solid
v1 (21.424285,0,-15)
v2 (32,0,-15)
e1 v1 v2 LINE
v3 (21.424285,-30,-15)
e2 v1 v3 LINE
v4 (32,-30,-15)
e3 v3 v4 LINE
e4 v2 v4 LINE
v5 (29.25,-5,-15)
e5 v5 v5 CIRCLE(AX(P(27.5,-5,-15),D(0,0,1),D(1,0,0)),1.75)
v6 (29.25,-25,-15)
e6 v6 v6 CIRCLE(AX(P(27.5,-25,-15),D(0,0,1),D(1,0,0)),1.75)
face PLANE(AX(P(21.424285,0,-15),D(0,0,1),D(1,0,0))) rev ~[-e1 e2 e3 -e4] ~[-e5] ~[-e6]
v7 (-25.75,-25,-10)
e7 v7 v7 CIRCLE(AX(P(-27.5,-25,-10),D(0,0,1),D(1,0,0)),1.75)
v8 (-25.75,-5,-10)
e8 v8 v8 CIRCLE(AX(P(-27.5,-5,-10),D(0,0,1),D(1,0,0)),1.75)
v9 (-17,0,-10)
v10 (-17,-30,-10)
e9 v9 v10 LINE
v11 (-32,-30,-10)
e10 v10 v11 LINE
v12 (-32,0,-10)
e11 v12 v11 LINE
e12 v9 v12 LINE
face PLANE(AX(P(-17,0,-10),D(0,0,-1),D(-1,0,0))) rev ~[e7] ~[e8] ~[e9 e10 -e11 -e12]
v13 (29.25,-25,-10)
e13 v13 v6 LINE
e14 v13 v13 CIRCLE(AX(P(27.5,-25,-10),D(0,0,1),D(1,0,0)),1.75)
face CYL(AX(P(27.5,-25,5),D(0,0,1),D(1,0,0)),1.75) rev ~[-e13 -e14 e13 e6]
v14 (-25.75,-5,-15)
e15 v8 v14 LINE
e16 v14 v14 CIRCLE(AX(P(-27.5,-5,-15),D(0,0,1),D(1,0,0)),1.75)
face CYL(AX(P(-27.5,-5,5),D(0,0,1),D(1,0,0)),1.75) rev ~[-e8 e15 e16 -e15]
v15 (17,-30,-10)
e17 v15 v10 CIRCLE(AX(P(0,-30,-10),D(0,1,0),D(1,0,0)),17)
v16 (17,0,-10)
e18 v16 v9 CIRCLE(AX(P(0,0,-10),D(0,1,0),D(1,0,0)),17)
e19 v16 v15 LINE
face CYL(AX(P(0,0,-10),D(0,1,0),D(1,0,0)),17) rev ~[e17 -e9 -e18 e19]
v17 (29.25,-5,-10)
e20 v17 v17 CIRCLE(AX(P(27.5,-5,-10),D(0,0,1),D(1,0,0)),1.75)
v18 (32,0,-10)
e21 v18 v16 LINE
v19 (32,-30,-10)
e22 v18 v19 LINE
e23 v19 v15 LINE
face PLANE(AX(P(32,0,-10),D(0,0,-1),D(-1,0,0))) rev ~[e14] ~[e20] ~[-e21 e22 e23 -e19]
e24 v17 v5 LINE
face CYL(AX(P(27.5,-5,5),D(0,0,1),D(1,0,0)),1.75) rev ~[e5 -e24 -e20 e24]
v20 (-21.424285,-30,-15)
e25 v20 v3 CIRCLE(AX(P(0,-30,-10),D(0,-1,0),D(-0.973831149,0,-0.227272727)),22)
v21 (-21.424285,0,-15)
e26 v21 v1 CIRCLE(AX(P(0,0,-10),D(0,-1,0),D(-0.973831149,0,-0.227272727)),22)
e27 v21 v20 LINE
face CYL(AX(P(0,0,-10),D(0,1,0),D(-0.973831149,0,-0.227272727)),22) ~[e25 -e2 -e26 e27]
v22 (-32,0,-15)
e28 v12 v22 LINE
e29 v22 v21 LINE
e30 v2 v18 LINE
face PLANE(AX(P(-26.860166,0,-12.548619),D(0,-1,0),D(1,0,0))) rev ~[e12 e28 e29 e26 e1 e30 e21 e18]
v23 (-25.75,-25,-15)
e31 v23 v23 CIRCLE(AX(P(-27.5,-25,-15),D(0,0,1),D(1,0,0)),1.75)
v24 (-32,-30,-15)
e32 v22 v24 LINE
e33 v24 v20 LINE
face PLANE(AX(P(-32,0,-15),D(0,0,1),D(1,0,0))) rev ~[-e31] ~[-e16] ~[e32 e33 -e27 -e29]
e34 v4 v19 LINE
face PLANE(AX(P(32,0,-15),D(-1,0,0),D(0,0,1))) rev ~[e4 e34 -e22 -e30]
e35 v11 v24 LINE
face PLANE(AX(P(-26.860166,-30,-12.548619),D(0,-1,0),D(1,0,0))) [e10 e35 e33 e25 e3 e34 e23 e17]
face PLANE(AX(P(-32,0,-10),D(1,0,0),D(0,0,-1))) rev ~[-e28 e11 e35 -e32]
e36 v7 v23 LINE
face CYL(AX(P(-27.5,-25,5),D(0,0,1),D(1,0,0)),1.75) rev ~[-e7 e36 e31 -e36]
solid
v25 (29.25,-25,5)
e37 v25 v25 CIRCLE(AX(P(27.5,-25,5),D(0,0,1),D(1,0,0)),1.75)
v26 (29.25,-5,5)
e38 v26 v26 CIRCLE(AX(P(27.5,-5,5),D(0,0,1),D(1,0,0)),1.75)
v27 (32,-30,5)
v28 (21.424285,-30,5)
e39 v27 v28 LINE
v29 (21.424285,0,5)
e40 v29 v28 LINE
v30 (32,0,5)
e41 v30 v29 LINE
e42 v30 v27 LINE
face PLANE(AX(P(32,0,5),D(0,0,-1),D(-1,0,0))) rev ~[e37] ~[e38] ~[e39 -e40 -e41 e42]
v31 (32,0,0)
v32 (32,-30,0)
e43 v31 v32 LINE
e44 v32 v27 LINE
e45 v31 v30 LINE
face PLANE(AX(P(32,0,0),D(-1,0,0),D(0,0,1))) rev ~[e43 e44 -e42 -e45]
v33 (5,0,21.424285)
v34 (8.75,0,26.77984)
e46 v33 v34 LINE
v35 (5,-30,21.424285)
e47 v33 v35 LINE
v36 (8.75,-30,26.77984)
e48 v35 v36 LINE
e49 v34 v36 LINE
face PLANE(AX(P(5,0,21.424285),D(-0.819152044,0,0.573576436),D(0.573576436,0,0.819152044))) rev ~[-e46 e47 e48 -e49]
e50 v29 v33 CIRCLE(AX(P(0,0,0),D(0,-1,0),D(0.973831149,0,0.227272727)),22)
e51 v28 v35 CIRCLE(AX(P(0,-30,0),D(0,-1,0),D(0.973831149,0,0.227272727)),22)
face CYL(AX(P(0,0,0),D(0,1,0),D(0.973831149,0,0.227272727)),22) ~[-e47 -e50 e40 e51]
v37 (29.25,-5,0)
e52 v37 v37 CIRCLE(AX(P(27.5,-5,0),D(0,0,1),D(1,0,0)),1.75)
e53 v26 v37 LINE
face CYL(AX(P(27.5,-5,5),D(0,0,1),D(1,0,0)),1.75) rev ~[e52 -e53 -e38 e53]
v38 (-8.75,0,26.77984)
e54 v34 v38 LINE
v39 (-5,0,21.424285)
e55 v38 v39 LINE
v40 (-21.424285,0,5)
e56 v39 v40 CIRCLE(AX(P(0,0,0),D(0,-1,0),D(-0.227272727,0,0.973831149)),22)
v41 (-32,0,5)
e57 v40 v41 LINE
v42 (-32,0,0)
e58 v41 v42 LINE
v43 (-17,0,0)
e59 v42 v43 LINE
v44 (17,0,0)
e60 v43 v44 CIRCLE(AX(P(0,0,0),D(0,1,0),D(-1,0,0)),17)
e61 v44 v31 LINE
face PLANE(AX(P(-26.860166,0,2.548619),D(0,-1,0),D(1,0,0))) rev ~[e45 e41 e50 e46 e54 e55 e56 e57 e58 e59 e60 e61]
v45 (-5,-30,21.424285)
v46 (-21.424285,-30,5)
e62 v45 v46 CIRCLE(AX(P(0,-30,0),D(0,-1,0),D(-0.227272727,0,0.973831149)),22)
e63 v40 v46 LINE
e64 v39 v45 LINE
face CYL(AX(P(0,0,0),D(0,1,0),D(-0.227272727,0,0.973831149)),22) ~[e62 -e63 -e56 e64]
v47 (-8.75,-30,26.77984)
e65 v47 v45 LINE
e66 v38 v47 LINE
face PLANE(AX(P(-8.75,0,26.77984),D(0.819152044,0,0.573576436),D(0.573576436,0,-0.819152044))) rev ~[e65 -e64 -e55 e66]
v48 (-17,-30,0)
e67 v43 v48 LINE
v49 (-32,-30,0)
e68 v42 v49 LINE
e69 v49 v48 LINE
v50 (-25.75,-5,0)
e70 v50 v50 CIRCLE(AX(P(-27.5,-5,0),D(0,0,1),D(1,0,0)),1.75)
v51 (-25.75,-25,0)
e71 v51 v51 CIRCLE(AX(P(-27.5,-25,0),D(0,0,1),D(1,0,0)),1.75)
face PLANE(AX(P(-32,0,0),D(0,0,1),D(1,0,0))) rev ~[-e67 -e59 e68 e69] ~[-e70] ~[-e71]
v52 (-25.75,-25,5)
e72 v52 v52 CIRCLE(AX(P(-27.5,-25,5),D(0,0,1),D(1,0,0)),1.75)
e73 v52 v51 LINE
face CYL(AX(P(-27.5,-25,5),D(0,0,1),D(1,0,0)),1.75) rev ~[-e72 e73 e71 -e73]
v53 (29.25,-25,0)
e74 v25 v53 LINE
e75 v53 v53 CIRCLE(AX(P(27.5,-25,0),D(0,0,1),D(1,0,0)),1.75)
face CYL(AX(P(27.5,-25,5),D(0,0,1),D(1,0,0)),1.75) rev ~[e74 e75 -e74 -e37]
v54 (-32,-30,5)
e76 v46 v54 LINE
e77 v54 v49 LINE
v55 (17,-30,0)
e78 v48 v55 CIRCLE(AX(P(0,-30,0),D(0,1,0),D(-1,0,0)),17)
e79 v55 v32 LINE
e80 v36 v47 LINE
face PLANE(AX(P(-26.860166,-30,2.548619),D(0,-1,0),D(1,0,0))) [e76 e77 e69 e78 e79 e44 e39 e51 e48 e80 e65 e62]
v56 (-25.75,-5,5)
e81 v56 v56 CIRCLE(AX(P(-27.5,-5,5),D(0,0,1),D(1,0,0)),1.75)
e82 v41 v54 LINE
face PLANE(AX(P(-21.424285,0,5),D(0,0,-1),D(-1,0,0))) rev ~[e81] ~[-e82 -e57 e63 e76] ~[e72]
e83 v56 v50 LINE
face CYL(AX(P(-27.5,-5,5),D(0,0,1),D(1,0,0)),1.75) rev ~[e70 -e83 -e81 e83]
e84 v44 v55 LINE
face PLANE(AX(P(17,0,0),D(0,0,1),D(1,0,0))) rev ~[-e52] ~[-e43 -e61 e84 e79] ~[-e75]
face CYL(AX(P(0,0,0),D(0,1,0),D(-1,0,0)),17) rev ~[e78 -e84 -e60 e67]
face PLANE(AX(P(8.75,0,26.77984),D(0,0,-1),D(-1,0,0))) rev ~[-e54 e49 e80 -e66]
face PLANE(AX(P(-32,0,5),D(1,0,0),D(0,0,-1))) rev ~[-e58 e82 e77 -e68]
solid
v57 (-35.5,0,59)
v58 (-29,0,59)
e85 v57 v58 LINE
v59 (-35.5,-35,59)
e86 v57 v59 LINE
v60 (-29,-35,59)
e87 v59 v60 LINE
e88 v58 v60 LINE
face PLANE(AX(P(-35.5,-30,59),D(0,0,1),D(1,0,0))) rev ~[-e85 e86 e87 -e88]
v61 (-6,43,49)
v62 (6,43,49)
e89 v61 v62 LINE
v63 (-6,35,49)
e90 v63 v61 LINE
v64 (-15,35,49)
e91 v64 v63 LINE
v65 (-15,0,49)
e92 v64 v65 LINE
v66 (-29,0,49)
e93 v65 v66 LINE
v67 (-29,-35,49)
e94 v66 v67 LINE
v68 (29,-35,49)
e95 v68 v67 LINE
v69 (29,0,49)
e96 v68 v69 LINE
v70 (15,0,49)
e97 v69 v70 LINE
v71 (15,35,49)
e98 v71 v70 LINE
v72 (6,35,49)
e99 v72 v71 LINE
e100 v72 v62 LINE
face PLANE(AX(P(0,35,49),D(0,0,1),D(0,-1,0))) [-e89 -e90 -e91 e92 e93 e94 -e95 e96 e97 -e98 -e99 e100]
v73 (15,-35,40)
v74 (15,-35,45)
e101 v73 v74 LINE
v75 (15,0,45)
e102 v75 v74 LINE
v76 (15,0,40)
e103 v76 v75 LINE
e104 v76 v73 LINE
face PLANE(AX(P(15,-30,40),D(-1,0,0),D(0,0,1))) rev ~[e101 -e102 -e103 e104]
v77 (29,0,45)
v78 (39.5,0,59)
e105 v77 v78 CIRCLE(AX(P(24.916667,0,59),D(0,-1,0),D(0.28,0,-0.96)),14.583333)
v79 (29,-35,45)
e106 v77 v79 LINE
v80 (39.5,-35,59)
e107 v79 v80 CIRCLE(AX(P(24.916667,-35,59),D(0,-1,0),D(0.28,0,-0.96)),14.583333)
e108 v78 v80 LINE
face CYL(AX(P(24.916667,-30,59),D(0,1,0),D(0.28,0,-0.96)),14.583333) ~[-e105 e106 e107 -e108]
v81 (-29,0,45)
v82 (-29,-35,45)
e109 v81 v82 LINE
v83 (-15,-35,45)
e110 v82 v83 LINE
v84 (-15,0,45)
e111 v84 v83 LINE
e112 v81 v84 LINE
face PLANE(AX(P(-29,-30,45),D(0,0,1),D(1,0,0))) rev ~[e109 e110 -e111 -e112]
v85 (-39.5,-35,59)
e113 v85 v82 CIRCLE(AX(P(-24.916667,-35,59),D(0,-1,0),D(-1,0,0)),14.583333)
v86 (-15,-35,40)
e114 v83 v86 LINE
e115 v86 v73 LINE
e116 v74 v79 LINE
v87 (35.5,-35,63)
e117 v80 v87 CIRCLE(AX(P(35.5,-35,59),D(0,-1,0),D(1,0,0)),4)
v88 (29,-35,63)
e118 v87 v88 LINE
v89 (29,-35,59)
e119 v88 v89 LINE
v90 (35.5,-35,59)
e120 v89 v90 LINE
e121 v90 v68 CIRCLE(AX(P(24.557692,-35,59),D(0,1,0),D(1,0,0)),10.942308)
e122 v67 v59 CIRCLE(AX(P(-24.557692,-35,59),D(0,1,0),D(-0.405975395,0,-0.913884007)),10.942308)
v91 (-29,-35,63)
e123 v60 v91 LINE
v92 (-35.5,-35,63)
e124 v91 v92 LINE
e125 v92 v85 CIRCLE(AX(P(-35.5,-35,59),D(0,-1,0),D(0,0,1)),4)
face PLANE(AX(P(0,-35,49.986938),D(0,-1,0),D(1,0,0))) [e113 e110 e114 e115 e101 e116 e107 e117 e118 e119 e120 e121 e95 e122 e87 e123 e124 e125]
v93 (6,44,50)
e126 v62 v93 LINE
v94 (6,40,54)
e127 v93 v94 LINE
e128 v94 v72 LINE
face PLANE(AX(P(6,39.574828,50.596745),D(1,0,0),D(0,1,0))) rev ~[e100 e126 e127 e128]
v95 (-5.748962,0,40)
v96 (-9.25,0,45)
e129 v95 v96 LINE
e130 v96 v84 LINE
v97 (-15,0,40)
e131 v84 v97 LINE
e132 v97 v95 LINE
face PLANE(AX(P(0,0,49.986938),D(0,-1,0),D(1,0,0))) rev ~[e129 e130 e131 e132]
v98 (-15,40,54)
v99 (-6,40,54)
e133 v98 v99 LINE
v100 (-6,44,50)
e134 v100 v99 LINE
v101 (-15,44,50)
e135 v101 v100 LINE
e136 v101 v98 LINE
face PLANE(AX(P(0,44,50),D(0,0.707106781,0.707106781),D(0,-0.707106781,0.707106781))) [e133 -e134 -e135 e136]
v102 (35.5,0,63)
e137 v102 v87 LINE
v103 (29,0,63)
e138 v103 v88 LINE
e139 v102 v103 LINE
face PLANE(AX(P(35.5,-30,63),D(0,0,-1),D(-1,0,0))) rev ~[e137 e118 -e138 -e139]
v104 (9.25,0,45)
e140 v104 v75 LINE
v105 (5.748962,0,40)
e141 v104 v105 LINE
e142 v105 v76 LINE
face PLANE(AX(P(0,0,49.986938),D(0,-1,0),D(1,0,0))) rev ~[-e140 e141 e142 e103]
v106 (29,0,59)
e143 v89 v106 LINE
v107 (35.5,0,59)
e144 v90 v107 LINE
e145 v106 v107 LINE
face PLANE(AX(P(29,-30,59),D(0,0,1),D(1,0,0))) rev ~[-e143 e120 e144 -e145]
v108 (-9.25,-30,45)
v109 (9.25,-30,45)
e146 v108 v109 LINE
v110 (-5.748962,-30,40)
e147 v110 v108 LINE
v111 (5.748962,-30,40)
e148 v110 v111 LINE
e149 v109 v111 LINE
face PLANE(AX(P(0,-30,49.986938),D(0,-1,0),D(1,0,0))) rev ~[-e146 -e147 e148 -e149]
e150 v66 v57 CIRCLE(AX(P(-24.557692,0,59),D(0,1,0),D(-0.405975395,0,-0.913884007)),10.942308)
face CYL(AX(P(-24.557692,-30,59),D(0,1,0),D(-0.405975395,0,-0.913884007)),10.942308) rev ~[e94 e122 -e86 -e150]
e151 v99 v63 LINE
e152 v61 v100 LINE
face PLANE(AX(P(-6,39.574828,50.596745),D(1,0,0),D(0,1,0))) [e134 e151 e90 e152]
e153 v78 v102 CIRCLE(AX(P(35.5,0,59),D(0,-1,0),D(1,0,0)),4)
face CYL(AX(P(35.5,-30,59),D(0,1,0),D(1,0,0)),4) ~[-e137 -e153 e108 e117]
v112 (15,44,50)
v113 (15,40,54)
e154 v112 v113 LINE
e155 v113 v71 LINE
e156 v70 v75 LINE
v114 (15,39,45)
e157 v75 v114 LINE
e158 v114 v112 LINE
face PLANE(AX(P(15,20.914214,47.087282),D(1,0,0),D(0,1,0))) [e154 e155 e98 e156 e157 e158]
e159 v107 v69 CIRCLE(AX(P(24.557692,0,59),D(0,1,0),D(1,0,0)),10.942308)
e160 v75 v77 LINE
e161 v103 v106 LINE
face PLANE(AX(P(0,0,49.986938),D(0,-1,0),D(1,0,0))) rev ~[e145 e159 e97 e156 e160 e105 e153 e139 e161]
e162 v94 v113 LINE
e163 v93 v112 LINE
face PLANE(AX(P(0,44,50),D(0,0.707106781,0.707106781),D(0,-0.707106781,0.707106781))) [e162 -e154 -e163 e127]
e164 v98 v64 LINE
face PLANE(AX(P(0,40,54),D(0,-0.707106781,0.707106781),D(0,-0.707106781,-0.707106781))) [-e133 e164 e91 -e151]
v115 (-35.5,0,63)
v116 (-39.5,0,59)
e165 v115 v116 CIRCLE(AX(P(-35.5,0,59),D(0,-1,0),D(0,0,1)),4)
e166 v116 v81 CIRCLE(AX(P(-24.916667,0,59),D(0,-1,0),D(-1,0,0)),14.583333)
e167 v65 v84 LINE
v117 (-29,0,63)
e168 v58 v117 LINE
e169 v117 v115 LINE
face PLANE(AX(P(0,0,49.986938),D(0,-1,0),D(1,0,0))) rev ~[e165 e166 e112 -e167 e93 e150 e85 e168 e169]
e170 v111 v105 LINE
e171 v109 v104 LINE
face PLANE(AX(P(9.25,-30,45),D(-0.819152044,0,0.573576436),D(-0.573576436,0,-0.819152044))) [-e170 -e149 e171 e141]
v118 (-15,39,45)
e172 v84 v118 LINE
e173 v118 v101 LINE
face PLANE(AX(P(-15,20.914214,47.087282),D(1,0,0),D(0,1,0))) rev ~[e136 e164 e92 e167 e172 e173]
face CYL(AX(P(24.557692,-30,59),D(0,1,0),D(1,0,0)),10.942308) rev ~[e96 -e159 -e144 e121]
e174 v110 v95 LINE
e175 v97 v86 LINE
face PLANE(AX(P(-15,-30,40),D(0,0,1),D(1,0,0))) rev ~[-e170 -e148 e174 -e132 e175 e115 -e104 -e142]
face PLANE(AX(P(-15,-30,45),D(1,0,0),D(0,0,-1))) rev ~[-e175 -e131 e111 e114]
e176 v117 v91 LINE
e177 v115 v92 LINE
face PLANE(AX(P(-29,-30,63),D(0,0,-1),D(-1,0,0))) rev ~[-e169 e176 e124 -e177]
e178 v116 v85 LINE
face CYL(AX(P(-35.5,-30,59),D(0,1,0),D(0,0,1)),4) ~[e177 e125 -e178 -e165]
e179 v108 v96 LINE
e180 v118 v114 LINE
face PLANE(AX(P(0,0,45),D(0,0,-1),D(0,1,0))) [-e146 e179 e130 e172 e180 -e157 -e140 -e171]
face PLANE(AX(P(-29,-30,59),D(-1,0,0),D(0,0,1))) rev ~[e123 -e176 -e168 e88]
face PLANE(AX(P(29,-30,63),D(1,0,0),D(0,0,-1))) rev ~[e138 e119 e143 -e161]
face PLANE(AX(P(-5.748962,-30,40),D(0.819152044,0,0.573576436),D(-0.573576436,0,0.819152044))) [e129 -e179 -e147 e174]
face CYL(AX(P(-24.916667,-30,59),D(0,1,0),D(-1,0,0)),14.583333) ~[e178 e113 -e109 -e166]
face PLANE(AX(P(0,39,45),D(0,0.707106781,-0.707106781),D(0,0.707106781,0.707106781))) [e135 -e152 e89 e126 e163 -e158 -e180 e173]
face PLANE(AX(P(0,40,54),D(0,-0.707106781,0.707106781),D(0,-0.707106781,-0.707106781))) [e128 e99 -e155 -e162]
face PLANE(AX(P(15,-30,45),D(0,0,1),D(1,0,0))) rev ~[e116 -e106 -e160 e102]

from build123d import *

# Parameters (mm, degrees)
F3_DEPTH      = 30
F4_DEPTH      = 5
F6_DEPTH      = 15
F6_DEPTH_BACK = 15
F7_DEPTH      = 6
F8_DEPTH      = 30
F9_DEPTH      = 30
F10_R         = 1.75
F11_DEPTH     = 50


# Not quite as in the source:
# - a feature names something its author has since deleted; it is built from what else it names


with BuildPart() as f3:
    # F2 (on offset) → F3 (new body)
    with BuildSketch(Plane.XZ.offset(30)):
        with BuildLine():
            Line((29, 49), (-29, 49))
            ThreePointArc((-29, 49), (-33.7322003399, 53.0365697791), (-35.5, 59))
            Line((-35.5, 59), (-29, 59))
            Line((-29, 59), (-29, 63))
            Line((-29, 63), (-35.5, 63))
            ThreePointArc((-35.5, 63), (-38.3284271247, 61.8284271247), (-39.5, 59))
            ThreePointArc((-39.5, 59), (-36.5833333333, 50.25), (-29, 45))
            Line((-29, 45), (-15, 45))
            Line((-15, 45), (-15, 40))
            Line((-15, 40), (-5.748962309, 40))
            Line((-5.748962309, 40), (-9.25, 45))
            Line((-9.25, 45), (9.25, 45))
            Line((9.25, 45), (5.748962309, 40))
            Line((5.748962309, 40), (15, 40))
            Line((15, 40), (15, 45))
            Line((15, 45), (29, 45))
            ThreePointArc((29, 45), (36.5833333333, 50.25), (39.5, 59))
            ThreePointArc((39.5, 59), (38.3284271247, 61.8284271247), (35.5, 63))
            Line((35.5, 63), (29, 63))
            Line((29, 63), (29, 59))
            Line((29, 59), (35.5, 59))
            ThreePointArc((35.5, 59), (33.7322003399, 53.0365697791), (29, 49))
        make_face()
    extrude(amount=-F3_DEPTH)

    # F2 (on offset) → F4 (join)
    with BuildSketch(Plane.XZ.offset(30)):
        with BuildLine():
            Line((29, 49), (-29, 49))
            ThreePointArc((-29, 49), (-33.7322003399, 53.0365697791), (-35.5, 59))
            Line((-35.5, 59), (-29, 59))
            Line((-29, 59), (-29, 63))
            Line((-29, 63), (-35.5, 63))
            ThreePointArc((-35.5, 63), (-38.3284271247, 61.8284271247), (-39.5, 59))
            ThreePointArc((-39.5, 59), (-36.5833333333, 50.25), (-29, 45))
            Line((-29, 45), (-15, 45))
            Line((-15, 45), (-15, 40))
            Line((-15, 40), (-5.748962309, 40))
            Line((-5.748962309, 40), (-9.25, 45))
            Line((-9.25, 45), (9.25, 45))
            Line((9.25, 45), (5.748962309, 40))
            Line((5.748962309, 40), (15, 40))
            Line((15, 40), (15, 45))
            Line((15, 45), (29, 45))
            ThreePointArc((29, 45), (36.5833333333, 50.25), (39.5, 59))
            ThreePointArc((39.5, 59), (38.3284271247, 61.8284271247), (35.5, 63))
            Line((35.5, 63), (29, 63))
            Line((29, 63), (29, 59))
            Line((29, 59), (35.5, 59))
            ThreePointArc((35.5, 59), (33.7322003399, 53.0365697791), (29, 49))
        make_face()
        Polygon((-9.25, 45), (-5.748962309, 40), (5.748962309, 40), (9.25, 45), align=None)
    extrude(amount=F4_DEPTH)

    # F5 (on Right) → F6 (join, two sides)
    with BuildSketch(Plane.YZ) as f6_sk:
        Polygon((35, 49), (0, 49), (0, 45), (39, 45), (43, 49), align=None)
        Polygon((40, 54), (35, 49), (43, 49), (44, 50), align=None)
    extrude(amount=F6_DEPTH)
    extrude(f6_sk.sketch, amount=-F6_DEPTH_BACK)

    # F5 (on Right) → F7 (cut, symmetric)
    with BuildSketch(Plane.YZ):
        Polygon((40, 54), (35, 49), (43, 49), (44, 50), align=None)
    extrude(amount=F7_DEPTH, both=True, mode=Mode.SUBTRACT)


with BuildPart() as f8:
    # F0 (on Front) → F8 (new body)
    with BuildSketch(Plane.XZ):
        with BuildLine():
            Line((-32, 0), (-22, 0))
            ThreePointArc((-22, 0), (-21.8555974099, 2.516517804), (-21.4242852856, 5))
            Line((-21.4242852856, 5), (-32, 5))
            Line((-32, 5), (-32, 0))
        make_face()
        with BuildLine():
            Line((-22, 0), (-17, 0))
            Line((-17, 0), (-17, 5))
            Line((-17, 5), (-21.4242852856, 5))
            ThreePointArc((-21.4242852856, 5), (-21.8555974099, 2.516517804), (-22, 0))
        make_face()
        with BuildLine():
            ThreePointArc((-17, 0), (0, 17), (17, 0))
            Line((17, 0), (17, 5))
            Line((17, 5), (21.4242852856, 5))
            ThreePointArc((21.4242852856, 5), (15.5563491861, 15.5563491861), (5, 21.4242852856))
            ThreePointArc((5, 21.4242852856), (0, 22), (-5, 21.4242852856))
            ThreePointArc((-5, 21.4242852856), (-15.5563491861, 15.5563491861), (-21.4242852856, 5))
            Line((-21.4242852856, 5), (-17, 5))
            Line((-17, 5), (-17, 0))
        make_face()
        with BuildLine():
            Line((17, 5), (17, 0))
            Line((17, 0), (22, 0))
            ThreePointArc((22, 0), (21.8555974099, 2.516517804), (21.4242852856, 5))
            Line((21.4242852856, 5), (17, 5))
        make_face()
        with BuildLine():
            ThreePointArc((21.4242852856, 5), (21.8555974099, 2.516517804), (22, 0))
            Line((22, 0), (32, 0))
            Line((32, 0), (32, 5))
            Line((32, 5), (21.4242852856, 5))
        make_face()
        with BuildLine():
            ThreePointArc((-5, 21.4242852856), (0, 22), (5, 21.4242852856))
            Line((5, 21.4242852856), (8.75, 26.7798403109))
            Line((8.75, 26.7798403109), (-8.75, 26.7798403109))
            Line((-8.75, 26.7798403109), (-5, 21.4242852856))
        make_face()
    extrude(amount=F8_DEPTH)


with BuildPart() as f9:
    # F0 (on Front) → F9 (new body)
    with BuildSketch(Plane.XZ):
        with BuildLine():
            ThreePointArc((-21.4242852856, -15), (-21.8555974099, -12.516517804), (-22, -10))
            Line((-22, -10), (-32, -10))
            Line((-32, -10), (-32, -15))
            Line((-32, -15), (-21.4242852856, -15))
        make_face()
        with BuildLine():
            Line((-17, -15), (-17, -10))
            Line((-17, -10), (-22, -10))
            ThreePointArc((-22, -10), (-21.8555974099, -12.516517804), (-21.4242852856, -15))
            Line((-21.4242852856, -15), (-17, -15))
        make_face()
        with BuildLine():
            ThreePointArc((17, -10), (0, -27), (-17, -10))
            Line((-17, -10), (-17, -15))
            Line((-17, -15), (-21.4242852856, -15))
            ThreePointArc((-21.4242852856, -15), (0, -32), (21.4242852856, -15))
            Line((21.4242852856, -15), (17, -15))
            Line((17, -15), (17, -10))
        make_face()
        with BuildLine():
            Line((22, -10), (17, -10))
            Line((17, -10), (17, -15))
            Line((17, -15), (21.4242852856, -15))
            ThreePointArc((21.4242852856, -15), (21.8555974099, -12.516517804), (22, -10))
        make_face()
        with BuildLine():
            Line((32, -10), (22, -10))
            ThreePointArc((22, -10), (21.8555974099, -12.516517804), (21.4242852856, -15))
            Line((21.4242852856, -15), (32, -15))
            Line((32, -15), (32, -10))
        make_face()
    extrude(amount=F9_DEPTH)


with BuildPart() as f11_tool:
    # F10 (on face) → F11 (new body)
    with BuildSketch(Plane.XY.offset(5)):
        with Locations((-27.5, -25)):
            Circle(F10_R)
        with Locations((-27.5, -5)):
            Circle(F10_R)
        with Locations((27.5, -5)):
            Circle(F10_R)
        with Locations((27.5, -25)):
            Circle(F10_R)
    extrude(amount=-F11_DEPTH)


with BuildPart() as f8_1:
    add(f8.part)

    # F11: cut by f11_tool
    add(f11_tool.part, mode=Mode.SUBTRACT)


with BuildPart() as f9_1:
    add(f9.part)

    # F11: cut by f11_tool
    add(f11_tool.part, mode=Mode.SUBTRACT)


solid = Compound([f3.part, f8_1.part, f9_1.part])
